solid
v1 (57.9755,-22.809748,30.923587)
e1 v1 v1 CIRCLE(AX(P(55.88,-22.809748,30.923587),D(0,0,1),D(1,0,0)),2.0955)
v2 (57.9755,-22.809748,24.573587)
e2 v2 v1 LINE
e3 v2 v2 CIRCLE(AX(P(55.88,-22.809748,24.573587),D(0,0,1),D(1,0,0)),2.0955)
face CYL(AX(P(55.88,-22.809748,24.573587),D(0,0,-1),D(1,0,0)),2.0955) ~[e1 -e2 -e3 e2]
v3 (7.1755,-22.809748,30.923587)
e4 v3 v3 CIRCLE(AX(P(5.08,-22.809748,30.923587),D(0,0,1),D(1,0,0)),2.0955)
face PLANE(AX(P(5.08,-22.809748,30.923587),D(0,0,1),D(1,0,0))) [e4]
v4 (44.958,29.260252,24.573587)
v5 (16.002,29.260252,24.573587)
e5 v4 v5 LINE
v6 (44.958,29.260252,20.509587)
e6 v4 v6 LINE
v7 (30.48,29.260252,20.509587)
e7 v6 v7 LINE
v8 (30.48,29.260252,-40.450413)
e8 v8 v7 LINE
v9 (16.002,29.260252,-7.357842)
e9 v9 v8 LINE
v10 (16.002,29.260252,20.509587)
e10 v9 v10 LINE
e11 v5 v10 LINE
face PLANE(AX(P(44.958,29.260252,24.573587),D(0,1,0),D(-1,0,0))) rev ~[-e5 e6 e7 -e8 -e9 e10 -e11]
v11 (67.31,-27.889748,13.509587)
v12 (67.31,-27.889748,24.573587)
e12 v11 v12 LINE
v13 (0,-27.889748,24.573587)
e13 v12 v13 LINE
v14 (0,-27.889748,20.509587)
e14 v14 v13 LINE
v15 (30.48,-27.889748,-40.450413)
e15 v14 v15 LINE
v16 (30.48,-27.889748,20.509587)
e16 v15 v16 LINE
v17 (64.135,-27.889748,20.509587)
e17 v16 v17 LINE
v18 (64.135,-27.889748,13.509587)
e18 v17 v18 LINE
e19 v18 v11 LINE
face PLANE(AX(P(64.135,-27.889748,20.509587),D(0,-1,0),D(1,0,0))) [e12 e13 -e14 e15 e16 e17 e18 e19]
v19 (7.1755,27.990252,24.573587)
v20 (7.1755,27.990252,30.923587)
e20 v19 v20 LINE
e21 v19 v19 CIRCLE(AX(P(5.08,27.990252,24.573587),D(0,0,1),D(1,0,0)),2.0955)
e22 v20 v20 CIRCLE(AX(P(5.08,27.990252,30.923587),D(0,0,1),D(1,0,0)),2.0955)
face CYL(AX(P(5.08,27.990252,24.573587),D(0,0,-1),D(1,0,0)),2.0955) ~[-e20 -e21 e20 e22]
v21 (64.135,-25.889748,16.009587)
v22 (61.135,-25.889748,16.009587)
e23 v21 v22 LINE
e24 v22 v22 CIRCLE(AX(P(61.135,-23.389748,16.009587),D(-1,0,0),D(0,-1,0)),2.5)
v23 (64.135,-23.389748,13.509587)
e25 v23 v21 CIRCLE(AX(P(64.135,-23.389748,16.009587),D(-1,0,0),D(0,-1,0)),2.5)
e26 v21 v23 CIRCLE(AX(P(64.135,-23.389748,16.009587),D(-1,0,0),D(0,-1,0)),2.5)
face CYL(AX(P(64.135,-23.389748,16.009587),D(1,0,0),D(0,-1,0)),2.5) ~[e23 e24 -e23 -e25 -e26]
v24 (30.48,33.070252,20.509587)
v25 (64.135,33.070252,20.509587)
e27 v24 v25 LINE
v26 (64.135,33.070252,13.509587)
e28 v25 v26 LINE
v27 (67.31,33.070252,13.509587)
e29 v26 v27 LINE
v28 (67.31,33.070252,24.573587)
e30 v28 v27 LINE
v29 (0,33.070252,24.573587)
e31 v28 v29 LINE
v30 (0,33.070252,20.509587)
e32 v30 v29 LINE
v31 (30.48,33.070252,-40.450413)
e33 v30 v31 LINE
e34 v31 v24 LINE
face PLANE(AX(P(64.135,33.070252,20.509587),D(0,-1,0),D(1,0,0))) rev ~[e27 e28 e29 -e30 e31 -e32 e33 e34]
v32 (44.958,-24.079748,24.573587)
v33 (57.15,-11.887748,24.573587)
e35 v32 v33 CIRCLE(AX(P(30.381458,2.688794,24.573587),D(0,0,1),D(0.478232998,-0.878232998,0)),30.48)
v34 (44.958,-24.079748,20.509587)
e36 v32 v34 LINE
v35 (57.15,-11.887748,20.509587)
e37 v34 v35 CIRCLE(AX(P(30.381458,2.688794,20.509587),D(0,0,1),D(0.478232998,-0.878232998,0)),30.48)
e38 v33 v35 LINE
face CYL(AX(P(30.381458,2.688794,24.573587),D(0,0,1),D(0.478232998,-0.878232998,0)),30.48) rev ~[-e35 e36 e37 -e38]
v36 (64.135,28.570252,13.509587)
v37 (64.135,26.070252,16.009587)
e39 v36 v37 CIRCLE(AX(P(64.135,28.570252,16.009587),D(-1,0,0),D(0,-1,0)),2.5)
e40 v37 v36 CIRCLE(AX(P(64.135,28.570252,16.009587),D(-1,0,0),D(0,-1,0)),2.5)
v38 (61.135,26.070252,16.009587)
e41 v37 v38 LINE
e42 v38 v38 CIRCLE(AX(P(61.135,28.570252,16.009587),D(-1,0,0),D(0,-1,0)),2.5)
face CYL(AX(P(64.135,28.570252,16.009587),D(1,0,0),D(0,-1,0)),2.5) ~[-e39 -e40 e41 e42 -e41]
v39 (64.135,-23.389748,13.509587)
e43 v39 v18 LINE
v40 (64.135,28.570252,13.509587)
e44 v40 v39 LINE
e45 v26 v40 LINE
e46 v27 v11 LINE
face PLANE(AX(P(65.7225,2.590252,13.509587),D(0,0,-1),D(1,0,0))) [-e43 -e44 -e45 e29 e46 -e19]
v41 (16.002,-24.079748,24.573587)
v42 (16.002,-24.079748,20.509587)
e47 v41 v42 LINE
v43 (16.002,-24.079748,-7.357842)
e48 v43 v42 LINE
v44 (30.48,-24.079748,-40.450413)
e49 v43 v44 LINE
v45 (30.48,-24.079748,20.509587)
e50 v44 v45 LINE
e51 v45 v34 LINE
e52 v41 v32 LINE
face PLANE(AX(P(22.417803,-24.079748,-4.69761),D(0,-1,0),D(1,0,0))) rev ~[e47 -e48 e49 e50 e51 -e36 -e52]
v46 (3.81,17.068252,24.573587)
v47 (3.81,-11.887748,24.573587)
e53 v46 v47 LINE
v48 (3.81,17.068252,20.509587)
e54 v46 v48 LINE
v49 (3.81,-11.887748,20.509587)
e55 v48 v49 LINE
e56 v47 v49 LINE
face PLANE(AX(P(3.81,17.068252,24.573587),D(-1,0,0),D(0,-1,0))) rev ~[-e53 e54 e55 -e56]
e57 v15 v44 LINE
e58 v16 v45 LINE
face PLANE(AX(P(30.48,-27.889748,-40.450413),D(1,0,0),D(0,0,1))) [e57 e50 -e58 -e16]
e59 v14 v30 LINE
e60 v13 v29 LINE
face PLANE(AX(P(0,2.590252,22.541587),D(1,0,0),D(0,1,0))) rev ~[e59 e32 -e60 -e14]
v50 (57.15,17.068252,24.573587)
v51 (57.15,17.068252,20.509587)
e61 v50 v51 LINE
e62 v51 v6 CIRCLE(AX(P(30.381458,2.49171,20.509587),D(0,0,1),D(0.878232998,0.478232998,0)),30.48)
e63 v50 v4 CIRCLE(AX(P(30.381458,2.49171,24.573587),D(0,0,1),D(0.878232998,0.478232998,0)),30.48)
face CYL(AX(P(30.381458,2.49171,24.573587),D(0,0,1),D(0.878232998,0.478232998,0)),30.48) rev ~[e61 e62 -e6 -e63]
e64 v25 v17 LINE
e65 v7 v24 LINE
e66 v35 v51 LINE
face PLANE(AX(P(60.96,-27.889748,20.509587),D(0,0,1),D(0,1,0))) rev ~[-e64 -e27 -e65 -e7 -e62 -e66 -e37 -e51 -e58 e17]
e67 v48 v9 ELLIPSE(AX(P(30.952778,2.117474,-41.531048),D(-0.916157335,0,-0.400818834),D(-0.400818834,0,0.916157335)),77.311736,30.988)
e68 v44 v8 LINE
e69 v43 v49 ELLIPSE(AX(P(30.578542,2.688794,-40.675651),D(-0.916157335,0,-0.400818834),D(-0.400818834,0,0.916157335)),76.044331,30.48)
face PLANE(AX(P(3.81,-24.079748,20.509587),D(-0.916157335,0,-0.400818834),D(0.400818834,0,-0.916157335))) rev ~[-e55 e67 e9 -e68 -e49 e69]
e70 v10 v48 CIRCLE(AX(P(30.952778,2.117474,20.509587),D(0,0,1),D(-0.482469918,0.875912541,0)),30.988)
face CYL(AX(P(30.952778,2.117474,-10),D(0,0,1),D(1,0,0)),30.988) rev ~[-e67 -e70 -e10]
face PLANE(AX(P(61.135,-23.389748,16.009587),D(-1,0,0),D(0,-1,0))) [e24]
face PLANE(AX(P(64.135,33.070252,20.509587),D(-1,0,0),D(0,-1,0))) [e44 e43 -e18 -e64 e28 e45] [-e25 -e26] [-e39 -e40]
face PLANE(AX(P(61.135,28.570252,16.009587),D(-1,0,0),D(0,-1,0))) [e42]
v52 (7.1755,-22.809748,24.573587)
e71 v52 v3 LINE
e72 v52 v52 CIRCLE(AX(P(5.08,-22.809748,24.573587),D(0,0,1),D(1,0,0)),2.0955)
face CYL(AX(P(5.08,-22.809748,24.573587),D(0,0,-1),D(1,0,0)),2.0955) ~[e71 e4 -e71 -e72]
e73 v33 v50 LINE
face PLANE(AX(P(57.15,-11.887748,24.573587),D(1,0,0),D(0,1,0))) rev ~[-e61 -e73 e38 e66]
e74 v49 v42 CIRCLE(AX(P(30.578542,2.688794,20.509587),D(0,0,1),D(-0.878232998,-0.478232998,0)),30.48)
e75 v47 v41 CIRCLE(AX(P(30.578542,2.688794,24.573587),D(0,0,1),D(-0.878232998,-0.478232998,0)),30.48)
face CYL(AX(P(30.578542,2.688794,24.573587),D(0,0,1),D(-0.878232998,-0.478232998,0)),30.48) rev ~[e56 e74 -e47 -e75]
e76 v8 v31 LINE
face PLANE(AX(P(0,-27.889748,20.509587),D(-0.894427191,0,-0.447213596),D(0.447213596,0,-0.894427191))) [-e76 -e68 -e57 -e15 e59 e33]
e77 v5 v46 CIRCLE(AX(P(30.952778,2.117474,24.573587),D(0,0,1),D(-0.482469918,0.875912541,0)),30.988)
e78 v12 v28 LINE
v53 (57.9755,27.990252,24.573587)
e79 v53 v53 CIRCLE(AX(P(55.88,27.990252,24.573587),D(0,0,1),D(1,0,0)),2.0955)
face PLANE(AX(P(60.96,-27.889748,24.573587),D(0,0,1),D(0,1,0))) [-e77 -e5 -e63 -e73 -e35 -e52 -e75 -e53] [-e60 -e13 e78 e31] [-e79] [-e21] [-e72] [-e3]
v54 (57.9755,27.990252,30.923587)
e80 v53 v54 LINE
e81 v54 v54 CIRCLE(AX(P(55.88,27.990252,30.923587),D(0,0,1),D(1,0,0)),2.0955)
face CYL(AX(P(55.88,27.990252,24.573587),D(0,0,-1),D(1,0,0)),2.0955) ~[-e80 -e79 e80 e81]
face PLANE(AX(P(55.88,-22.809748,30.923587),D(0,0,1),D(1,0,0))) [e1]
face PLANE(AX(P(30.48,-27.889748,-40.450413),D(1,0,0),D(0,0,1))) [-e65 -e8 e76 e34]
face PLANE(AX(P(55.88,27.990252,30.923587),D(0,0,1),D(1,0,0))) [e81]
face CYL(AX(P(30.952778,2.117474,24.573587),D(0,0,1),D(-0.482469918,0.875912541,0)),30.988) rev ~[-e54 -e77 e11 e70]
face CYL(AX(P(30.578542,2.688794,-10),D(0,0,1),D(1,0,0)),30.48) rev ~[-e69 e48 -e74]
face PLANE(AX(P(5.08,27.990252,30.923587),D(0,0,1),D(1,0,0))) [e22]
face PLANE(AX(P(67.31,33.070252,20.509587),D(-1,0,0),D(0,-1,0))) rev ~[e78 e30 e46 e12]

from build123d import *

# Parameters (mm, degrees)
F0_W        = 60.96
F0_H        = 4.064
F1_DEPTH    = 60.96
F3_DEPTH    = 25.4
F4_R        = 2.0955
F5_DEPTH    = 6.35
F7_DEPTH    = 60.96
F8_T4_DEPTH = 53.34
F8_S5_R     = 30.988
F8_T6_DEPTH = 44
F8_S7_R     = 30.48
F8_T8_DEPTH = 44
F9_W        = 60.96
F9_H        = 4.064
F10_DEPTH   = 6.35
F11_W       = 3.175
F11_H       = 60.96
F12_DEPTH   = 7
F13_R       = 2.5
F14_DEPTH   = 3
F15_R       = 2.5
F16_DEPTH   = 3


# Not quite as in the source:
# - a fillet or chamfer that OpenCascade refuses, or shapes differently, is made with other operations: its cross-section is extruded or revolved along the edge and cut away or added


with BuildPart() as f1:
    # F0 (on Right) → F1 (new body)
    with BuildSketch(Plane.YZ):
        with Locations((2.5902520865, 22.5415869818)):
            Rectangle(F0_W, F0_H)
    extrude(amount=F1_DEPTH)

    # F2 (on face) → F3 (cut)
    with BuildSketch(Plane.XY.offset(24.5735869818)):
        with BuildLine():
            Line((16.002, -24.0797479135), (44.958, -24.0797479135))
            ThreePointArc((44.958, -24.0797479135), (51.934072902, -18.8638208155), (57.15, -11.8877479135))
            Line((57.15, -11.8877479135), (57.15, 17.0682520865))
            ThreePointArc((57.15, 17.0682520865), (51.934072902, 24.0443249885), (44.958, 29.2602520865))
            Line((44.958, 29.2602520865), (16.002, 29.2602520865))
            ThreePointArc((16.002, 29.2602520865), (9.0409528702, 24.0292992163), (3.81, 17.0682520865))
            Line((3.81, 17.0682520865), (3.81, -11.8877479135))
            ThreePointArc((3.81, -11.8877479135), (9.025927098, -18.8638208155), (16.002, -24.0797479135))
        make_face()
    extrude(amount=-F3_DEPTH, mode=Mode.SUBTRACT)

    # F4 (on face) → F5 (join)
    with BuildSketch(Plane.XY.offset(24.5735869818)):
        with Locations((55.88, -22.8097479135)):
            Circle(F4_R)
        with Locations((55.88, 27.9902520865)):
            Circle(F4_R)
        with Locations((5.08, -22.8097479135)):
            Circle(F4_R)
        with Locations((5.08, 27.9902520865)):
            Circle(F4_R)
    extrude(amount=F5_DEPTH)

    # F6 (on face) → F7 (join)
    with BuildSketch(Plane.XZ.offset(27.8897479135)):
        Polygon((30.48, -40.4504130182), (30.48, 20.5095869818), (0, 20.5095869818), align=None)
    extrude(amount=-F7_DEPTH)

    # F8: chamfer of 60.96 x 26.67 on 1 edges, made by hand


with BuildPart() as f8_tool2:
    # F8_s3 → F8_t4 (new body)
    with BuildSketch(Plane.XZ.offset(24.0797479135)):
        Polygon((3.81, 20.5095869818), (30.48, -40.4504130182), (30.48, 20.5095869818), align=None)
    extrude(amount=-F8_T4_DEPTH)

    # F8_s5 → F8_t6 (intersect, symmetric)
    with BuildSketch(Plane.XY.offset(-10)):
        with Locations((30.9527778056, 2.1174742809)):
            Circle(F8_S5_R)
    extrude(amount=F8_T6_DEPTH, both=True, mode=Mode.INTERSECT)

    # F8_s7 → F8_t8 (intersect, symmetric)
    with BuildSketch(Plane.XY.offset(-10)):
        with Locations((30.5785417886, 2.6887938751)):
            Circle(F8_S7_R)
    extrude(amount=F8_T8_DEPTH, both=True, mode=Mode.INTERSECT)


with BuildPart() as f1_1:
    add(f1.part)

    # F8_t1: cut F8_tool2
    add(f8_tool2.part, mode=Mode.SUBTRACT)

    # F9 (on face) → F10 (join)
    with BuildSketch(Plane.YZ.offset(60.96)):
        with Locations((2.5902520865, 22.5415869818)):
            Rectangle(F9_W, F9_H)
    extrude(amount=F10_DEPTH)

    # F11 (on face) → F12 (join)
    with BuildSketch(Plane(origin=(0, 0, 20.5095869818), x_dir=(1, 0, 0), z_dir=(0, 0, -1))):
        with Locations((65.7225, -2.5902520865)):
            Rectangle(F11_W, F11_H)
    extrude(amount=F12_DEPTH)

    # F13 (on face) → F14 (join)
    with BuildSketch(Plane(origin=(64.135, 0, 0), x_dir=(0, -1, 0), z_dir=(-1, 0, 0))):
        with Locations((-28.5702520865, 16.0095869818)):
            Circle(F13_R)
    extrude(amount=F14_DEPTH)

    # F15 (on face) → F16 (join)
    with BuildSketch(Plane(origin=(64.135, 0, 0), x_dir=(0, -1, 0), z_dir=(-1, 0, 0))):
        with Locations((23.3897479135, 16.0095869818)):
            Circle(F15_R)
    extrude(amount=F16_DEPTH)


solid = f1_1.part
